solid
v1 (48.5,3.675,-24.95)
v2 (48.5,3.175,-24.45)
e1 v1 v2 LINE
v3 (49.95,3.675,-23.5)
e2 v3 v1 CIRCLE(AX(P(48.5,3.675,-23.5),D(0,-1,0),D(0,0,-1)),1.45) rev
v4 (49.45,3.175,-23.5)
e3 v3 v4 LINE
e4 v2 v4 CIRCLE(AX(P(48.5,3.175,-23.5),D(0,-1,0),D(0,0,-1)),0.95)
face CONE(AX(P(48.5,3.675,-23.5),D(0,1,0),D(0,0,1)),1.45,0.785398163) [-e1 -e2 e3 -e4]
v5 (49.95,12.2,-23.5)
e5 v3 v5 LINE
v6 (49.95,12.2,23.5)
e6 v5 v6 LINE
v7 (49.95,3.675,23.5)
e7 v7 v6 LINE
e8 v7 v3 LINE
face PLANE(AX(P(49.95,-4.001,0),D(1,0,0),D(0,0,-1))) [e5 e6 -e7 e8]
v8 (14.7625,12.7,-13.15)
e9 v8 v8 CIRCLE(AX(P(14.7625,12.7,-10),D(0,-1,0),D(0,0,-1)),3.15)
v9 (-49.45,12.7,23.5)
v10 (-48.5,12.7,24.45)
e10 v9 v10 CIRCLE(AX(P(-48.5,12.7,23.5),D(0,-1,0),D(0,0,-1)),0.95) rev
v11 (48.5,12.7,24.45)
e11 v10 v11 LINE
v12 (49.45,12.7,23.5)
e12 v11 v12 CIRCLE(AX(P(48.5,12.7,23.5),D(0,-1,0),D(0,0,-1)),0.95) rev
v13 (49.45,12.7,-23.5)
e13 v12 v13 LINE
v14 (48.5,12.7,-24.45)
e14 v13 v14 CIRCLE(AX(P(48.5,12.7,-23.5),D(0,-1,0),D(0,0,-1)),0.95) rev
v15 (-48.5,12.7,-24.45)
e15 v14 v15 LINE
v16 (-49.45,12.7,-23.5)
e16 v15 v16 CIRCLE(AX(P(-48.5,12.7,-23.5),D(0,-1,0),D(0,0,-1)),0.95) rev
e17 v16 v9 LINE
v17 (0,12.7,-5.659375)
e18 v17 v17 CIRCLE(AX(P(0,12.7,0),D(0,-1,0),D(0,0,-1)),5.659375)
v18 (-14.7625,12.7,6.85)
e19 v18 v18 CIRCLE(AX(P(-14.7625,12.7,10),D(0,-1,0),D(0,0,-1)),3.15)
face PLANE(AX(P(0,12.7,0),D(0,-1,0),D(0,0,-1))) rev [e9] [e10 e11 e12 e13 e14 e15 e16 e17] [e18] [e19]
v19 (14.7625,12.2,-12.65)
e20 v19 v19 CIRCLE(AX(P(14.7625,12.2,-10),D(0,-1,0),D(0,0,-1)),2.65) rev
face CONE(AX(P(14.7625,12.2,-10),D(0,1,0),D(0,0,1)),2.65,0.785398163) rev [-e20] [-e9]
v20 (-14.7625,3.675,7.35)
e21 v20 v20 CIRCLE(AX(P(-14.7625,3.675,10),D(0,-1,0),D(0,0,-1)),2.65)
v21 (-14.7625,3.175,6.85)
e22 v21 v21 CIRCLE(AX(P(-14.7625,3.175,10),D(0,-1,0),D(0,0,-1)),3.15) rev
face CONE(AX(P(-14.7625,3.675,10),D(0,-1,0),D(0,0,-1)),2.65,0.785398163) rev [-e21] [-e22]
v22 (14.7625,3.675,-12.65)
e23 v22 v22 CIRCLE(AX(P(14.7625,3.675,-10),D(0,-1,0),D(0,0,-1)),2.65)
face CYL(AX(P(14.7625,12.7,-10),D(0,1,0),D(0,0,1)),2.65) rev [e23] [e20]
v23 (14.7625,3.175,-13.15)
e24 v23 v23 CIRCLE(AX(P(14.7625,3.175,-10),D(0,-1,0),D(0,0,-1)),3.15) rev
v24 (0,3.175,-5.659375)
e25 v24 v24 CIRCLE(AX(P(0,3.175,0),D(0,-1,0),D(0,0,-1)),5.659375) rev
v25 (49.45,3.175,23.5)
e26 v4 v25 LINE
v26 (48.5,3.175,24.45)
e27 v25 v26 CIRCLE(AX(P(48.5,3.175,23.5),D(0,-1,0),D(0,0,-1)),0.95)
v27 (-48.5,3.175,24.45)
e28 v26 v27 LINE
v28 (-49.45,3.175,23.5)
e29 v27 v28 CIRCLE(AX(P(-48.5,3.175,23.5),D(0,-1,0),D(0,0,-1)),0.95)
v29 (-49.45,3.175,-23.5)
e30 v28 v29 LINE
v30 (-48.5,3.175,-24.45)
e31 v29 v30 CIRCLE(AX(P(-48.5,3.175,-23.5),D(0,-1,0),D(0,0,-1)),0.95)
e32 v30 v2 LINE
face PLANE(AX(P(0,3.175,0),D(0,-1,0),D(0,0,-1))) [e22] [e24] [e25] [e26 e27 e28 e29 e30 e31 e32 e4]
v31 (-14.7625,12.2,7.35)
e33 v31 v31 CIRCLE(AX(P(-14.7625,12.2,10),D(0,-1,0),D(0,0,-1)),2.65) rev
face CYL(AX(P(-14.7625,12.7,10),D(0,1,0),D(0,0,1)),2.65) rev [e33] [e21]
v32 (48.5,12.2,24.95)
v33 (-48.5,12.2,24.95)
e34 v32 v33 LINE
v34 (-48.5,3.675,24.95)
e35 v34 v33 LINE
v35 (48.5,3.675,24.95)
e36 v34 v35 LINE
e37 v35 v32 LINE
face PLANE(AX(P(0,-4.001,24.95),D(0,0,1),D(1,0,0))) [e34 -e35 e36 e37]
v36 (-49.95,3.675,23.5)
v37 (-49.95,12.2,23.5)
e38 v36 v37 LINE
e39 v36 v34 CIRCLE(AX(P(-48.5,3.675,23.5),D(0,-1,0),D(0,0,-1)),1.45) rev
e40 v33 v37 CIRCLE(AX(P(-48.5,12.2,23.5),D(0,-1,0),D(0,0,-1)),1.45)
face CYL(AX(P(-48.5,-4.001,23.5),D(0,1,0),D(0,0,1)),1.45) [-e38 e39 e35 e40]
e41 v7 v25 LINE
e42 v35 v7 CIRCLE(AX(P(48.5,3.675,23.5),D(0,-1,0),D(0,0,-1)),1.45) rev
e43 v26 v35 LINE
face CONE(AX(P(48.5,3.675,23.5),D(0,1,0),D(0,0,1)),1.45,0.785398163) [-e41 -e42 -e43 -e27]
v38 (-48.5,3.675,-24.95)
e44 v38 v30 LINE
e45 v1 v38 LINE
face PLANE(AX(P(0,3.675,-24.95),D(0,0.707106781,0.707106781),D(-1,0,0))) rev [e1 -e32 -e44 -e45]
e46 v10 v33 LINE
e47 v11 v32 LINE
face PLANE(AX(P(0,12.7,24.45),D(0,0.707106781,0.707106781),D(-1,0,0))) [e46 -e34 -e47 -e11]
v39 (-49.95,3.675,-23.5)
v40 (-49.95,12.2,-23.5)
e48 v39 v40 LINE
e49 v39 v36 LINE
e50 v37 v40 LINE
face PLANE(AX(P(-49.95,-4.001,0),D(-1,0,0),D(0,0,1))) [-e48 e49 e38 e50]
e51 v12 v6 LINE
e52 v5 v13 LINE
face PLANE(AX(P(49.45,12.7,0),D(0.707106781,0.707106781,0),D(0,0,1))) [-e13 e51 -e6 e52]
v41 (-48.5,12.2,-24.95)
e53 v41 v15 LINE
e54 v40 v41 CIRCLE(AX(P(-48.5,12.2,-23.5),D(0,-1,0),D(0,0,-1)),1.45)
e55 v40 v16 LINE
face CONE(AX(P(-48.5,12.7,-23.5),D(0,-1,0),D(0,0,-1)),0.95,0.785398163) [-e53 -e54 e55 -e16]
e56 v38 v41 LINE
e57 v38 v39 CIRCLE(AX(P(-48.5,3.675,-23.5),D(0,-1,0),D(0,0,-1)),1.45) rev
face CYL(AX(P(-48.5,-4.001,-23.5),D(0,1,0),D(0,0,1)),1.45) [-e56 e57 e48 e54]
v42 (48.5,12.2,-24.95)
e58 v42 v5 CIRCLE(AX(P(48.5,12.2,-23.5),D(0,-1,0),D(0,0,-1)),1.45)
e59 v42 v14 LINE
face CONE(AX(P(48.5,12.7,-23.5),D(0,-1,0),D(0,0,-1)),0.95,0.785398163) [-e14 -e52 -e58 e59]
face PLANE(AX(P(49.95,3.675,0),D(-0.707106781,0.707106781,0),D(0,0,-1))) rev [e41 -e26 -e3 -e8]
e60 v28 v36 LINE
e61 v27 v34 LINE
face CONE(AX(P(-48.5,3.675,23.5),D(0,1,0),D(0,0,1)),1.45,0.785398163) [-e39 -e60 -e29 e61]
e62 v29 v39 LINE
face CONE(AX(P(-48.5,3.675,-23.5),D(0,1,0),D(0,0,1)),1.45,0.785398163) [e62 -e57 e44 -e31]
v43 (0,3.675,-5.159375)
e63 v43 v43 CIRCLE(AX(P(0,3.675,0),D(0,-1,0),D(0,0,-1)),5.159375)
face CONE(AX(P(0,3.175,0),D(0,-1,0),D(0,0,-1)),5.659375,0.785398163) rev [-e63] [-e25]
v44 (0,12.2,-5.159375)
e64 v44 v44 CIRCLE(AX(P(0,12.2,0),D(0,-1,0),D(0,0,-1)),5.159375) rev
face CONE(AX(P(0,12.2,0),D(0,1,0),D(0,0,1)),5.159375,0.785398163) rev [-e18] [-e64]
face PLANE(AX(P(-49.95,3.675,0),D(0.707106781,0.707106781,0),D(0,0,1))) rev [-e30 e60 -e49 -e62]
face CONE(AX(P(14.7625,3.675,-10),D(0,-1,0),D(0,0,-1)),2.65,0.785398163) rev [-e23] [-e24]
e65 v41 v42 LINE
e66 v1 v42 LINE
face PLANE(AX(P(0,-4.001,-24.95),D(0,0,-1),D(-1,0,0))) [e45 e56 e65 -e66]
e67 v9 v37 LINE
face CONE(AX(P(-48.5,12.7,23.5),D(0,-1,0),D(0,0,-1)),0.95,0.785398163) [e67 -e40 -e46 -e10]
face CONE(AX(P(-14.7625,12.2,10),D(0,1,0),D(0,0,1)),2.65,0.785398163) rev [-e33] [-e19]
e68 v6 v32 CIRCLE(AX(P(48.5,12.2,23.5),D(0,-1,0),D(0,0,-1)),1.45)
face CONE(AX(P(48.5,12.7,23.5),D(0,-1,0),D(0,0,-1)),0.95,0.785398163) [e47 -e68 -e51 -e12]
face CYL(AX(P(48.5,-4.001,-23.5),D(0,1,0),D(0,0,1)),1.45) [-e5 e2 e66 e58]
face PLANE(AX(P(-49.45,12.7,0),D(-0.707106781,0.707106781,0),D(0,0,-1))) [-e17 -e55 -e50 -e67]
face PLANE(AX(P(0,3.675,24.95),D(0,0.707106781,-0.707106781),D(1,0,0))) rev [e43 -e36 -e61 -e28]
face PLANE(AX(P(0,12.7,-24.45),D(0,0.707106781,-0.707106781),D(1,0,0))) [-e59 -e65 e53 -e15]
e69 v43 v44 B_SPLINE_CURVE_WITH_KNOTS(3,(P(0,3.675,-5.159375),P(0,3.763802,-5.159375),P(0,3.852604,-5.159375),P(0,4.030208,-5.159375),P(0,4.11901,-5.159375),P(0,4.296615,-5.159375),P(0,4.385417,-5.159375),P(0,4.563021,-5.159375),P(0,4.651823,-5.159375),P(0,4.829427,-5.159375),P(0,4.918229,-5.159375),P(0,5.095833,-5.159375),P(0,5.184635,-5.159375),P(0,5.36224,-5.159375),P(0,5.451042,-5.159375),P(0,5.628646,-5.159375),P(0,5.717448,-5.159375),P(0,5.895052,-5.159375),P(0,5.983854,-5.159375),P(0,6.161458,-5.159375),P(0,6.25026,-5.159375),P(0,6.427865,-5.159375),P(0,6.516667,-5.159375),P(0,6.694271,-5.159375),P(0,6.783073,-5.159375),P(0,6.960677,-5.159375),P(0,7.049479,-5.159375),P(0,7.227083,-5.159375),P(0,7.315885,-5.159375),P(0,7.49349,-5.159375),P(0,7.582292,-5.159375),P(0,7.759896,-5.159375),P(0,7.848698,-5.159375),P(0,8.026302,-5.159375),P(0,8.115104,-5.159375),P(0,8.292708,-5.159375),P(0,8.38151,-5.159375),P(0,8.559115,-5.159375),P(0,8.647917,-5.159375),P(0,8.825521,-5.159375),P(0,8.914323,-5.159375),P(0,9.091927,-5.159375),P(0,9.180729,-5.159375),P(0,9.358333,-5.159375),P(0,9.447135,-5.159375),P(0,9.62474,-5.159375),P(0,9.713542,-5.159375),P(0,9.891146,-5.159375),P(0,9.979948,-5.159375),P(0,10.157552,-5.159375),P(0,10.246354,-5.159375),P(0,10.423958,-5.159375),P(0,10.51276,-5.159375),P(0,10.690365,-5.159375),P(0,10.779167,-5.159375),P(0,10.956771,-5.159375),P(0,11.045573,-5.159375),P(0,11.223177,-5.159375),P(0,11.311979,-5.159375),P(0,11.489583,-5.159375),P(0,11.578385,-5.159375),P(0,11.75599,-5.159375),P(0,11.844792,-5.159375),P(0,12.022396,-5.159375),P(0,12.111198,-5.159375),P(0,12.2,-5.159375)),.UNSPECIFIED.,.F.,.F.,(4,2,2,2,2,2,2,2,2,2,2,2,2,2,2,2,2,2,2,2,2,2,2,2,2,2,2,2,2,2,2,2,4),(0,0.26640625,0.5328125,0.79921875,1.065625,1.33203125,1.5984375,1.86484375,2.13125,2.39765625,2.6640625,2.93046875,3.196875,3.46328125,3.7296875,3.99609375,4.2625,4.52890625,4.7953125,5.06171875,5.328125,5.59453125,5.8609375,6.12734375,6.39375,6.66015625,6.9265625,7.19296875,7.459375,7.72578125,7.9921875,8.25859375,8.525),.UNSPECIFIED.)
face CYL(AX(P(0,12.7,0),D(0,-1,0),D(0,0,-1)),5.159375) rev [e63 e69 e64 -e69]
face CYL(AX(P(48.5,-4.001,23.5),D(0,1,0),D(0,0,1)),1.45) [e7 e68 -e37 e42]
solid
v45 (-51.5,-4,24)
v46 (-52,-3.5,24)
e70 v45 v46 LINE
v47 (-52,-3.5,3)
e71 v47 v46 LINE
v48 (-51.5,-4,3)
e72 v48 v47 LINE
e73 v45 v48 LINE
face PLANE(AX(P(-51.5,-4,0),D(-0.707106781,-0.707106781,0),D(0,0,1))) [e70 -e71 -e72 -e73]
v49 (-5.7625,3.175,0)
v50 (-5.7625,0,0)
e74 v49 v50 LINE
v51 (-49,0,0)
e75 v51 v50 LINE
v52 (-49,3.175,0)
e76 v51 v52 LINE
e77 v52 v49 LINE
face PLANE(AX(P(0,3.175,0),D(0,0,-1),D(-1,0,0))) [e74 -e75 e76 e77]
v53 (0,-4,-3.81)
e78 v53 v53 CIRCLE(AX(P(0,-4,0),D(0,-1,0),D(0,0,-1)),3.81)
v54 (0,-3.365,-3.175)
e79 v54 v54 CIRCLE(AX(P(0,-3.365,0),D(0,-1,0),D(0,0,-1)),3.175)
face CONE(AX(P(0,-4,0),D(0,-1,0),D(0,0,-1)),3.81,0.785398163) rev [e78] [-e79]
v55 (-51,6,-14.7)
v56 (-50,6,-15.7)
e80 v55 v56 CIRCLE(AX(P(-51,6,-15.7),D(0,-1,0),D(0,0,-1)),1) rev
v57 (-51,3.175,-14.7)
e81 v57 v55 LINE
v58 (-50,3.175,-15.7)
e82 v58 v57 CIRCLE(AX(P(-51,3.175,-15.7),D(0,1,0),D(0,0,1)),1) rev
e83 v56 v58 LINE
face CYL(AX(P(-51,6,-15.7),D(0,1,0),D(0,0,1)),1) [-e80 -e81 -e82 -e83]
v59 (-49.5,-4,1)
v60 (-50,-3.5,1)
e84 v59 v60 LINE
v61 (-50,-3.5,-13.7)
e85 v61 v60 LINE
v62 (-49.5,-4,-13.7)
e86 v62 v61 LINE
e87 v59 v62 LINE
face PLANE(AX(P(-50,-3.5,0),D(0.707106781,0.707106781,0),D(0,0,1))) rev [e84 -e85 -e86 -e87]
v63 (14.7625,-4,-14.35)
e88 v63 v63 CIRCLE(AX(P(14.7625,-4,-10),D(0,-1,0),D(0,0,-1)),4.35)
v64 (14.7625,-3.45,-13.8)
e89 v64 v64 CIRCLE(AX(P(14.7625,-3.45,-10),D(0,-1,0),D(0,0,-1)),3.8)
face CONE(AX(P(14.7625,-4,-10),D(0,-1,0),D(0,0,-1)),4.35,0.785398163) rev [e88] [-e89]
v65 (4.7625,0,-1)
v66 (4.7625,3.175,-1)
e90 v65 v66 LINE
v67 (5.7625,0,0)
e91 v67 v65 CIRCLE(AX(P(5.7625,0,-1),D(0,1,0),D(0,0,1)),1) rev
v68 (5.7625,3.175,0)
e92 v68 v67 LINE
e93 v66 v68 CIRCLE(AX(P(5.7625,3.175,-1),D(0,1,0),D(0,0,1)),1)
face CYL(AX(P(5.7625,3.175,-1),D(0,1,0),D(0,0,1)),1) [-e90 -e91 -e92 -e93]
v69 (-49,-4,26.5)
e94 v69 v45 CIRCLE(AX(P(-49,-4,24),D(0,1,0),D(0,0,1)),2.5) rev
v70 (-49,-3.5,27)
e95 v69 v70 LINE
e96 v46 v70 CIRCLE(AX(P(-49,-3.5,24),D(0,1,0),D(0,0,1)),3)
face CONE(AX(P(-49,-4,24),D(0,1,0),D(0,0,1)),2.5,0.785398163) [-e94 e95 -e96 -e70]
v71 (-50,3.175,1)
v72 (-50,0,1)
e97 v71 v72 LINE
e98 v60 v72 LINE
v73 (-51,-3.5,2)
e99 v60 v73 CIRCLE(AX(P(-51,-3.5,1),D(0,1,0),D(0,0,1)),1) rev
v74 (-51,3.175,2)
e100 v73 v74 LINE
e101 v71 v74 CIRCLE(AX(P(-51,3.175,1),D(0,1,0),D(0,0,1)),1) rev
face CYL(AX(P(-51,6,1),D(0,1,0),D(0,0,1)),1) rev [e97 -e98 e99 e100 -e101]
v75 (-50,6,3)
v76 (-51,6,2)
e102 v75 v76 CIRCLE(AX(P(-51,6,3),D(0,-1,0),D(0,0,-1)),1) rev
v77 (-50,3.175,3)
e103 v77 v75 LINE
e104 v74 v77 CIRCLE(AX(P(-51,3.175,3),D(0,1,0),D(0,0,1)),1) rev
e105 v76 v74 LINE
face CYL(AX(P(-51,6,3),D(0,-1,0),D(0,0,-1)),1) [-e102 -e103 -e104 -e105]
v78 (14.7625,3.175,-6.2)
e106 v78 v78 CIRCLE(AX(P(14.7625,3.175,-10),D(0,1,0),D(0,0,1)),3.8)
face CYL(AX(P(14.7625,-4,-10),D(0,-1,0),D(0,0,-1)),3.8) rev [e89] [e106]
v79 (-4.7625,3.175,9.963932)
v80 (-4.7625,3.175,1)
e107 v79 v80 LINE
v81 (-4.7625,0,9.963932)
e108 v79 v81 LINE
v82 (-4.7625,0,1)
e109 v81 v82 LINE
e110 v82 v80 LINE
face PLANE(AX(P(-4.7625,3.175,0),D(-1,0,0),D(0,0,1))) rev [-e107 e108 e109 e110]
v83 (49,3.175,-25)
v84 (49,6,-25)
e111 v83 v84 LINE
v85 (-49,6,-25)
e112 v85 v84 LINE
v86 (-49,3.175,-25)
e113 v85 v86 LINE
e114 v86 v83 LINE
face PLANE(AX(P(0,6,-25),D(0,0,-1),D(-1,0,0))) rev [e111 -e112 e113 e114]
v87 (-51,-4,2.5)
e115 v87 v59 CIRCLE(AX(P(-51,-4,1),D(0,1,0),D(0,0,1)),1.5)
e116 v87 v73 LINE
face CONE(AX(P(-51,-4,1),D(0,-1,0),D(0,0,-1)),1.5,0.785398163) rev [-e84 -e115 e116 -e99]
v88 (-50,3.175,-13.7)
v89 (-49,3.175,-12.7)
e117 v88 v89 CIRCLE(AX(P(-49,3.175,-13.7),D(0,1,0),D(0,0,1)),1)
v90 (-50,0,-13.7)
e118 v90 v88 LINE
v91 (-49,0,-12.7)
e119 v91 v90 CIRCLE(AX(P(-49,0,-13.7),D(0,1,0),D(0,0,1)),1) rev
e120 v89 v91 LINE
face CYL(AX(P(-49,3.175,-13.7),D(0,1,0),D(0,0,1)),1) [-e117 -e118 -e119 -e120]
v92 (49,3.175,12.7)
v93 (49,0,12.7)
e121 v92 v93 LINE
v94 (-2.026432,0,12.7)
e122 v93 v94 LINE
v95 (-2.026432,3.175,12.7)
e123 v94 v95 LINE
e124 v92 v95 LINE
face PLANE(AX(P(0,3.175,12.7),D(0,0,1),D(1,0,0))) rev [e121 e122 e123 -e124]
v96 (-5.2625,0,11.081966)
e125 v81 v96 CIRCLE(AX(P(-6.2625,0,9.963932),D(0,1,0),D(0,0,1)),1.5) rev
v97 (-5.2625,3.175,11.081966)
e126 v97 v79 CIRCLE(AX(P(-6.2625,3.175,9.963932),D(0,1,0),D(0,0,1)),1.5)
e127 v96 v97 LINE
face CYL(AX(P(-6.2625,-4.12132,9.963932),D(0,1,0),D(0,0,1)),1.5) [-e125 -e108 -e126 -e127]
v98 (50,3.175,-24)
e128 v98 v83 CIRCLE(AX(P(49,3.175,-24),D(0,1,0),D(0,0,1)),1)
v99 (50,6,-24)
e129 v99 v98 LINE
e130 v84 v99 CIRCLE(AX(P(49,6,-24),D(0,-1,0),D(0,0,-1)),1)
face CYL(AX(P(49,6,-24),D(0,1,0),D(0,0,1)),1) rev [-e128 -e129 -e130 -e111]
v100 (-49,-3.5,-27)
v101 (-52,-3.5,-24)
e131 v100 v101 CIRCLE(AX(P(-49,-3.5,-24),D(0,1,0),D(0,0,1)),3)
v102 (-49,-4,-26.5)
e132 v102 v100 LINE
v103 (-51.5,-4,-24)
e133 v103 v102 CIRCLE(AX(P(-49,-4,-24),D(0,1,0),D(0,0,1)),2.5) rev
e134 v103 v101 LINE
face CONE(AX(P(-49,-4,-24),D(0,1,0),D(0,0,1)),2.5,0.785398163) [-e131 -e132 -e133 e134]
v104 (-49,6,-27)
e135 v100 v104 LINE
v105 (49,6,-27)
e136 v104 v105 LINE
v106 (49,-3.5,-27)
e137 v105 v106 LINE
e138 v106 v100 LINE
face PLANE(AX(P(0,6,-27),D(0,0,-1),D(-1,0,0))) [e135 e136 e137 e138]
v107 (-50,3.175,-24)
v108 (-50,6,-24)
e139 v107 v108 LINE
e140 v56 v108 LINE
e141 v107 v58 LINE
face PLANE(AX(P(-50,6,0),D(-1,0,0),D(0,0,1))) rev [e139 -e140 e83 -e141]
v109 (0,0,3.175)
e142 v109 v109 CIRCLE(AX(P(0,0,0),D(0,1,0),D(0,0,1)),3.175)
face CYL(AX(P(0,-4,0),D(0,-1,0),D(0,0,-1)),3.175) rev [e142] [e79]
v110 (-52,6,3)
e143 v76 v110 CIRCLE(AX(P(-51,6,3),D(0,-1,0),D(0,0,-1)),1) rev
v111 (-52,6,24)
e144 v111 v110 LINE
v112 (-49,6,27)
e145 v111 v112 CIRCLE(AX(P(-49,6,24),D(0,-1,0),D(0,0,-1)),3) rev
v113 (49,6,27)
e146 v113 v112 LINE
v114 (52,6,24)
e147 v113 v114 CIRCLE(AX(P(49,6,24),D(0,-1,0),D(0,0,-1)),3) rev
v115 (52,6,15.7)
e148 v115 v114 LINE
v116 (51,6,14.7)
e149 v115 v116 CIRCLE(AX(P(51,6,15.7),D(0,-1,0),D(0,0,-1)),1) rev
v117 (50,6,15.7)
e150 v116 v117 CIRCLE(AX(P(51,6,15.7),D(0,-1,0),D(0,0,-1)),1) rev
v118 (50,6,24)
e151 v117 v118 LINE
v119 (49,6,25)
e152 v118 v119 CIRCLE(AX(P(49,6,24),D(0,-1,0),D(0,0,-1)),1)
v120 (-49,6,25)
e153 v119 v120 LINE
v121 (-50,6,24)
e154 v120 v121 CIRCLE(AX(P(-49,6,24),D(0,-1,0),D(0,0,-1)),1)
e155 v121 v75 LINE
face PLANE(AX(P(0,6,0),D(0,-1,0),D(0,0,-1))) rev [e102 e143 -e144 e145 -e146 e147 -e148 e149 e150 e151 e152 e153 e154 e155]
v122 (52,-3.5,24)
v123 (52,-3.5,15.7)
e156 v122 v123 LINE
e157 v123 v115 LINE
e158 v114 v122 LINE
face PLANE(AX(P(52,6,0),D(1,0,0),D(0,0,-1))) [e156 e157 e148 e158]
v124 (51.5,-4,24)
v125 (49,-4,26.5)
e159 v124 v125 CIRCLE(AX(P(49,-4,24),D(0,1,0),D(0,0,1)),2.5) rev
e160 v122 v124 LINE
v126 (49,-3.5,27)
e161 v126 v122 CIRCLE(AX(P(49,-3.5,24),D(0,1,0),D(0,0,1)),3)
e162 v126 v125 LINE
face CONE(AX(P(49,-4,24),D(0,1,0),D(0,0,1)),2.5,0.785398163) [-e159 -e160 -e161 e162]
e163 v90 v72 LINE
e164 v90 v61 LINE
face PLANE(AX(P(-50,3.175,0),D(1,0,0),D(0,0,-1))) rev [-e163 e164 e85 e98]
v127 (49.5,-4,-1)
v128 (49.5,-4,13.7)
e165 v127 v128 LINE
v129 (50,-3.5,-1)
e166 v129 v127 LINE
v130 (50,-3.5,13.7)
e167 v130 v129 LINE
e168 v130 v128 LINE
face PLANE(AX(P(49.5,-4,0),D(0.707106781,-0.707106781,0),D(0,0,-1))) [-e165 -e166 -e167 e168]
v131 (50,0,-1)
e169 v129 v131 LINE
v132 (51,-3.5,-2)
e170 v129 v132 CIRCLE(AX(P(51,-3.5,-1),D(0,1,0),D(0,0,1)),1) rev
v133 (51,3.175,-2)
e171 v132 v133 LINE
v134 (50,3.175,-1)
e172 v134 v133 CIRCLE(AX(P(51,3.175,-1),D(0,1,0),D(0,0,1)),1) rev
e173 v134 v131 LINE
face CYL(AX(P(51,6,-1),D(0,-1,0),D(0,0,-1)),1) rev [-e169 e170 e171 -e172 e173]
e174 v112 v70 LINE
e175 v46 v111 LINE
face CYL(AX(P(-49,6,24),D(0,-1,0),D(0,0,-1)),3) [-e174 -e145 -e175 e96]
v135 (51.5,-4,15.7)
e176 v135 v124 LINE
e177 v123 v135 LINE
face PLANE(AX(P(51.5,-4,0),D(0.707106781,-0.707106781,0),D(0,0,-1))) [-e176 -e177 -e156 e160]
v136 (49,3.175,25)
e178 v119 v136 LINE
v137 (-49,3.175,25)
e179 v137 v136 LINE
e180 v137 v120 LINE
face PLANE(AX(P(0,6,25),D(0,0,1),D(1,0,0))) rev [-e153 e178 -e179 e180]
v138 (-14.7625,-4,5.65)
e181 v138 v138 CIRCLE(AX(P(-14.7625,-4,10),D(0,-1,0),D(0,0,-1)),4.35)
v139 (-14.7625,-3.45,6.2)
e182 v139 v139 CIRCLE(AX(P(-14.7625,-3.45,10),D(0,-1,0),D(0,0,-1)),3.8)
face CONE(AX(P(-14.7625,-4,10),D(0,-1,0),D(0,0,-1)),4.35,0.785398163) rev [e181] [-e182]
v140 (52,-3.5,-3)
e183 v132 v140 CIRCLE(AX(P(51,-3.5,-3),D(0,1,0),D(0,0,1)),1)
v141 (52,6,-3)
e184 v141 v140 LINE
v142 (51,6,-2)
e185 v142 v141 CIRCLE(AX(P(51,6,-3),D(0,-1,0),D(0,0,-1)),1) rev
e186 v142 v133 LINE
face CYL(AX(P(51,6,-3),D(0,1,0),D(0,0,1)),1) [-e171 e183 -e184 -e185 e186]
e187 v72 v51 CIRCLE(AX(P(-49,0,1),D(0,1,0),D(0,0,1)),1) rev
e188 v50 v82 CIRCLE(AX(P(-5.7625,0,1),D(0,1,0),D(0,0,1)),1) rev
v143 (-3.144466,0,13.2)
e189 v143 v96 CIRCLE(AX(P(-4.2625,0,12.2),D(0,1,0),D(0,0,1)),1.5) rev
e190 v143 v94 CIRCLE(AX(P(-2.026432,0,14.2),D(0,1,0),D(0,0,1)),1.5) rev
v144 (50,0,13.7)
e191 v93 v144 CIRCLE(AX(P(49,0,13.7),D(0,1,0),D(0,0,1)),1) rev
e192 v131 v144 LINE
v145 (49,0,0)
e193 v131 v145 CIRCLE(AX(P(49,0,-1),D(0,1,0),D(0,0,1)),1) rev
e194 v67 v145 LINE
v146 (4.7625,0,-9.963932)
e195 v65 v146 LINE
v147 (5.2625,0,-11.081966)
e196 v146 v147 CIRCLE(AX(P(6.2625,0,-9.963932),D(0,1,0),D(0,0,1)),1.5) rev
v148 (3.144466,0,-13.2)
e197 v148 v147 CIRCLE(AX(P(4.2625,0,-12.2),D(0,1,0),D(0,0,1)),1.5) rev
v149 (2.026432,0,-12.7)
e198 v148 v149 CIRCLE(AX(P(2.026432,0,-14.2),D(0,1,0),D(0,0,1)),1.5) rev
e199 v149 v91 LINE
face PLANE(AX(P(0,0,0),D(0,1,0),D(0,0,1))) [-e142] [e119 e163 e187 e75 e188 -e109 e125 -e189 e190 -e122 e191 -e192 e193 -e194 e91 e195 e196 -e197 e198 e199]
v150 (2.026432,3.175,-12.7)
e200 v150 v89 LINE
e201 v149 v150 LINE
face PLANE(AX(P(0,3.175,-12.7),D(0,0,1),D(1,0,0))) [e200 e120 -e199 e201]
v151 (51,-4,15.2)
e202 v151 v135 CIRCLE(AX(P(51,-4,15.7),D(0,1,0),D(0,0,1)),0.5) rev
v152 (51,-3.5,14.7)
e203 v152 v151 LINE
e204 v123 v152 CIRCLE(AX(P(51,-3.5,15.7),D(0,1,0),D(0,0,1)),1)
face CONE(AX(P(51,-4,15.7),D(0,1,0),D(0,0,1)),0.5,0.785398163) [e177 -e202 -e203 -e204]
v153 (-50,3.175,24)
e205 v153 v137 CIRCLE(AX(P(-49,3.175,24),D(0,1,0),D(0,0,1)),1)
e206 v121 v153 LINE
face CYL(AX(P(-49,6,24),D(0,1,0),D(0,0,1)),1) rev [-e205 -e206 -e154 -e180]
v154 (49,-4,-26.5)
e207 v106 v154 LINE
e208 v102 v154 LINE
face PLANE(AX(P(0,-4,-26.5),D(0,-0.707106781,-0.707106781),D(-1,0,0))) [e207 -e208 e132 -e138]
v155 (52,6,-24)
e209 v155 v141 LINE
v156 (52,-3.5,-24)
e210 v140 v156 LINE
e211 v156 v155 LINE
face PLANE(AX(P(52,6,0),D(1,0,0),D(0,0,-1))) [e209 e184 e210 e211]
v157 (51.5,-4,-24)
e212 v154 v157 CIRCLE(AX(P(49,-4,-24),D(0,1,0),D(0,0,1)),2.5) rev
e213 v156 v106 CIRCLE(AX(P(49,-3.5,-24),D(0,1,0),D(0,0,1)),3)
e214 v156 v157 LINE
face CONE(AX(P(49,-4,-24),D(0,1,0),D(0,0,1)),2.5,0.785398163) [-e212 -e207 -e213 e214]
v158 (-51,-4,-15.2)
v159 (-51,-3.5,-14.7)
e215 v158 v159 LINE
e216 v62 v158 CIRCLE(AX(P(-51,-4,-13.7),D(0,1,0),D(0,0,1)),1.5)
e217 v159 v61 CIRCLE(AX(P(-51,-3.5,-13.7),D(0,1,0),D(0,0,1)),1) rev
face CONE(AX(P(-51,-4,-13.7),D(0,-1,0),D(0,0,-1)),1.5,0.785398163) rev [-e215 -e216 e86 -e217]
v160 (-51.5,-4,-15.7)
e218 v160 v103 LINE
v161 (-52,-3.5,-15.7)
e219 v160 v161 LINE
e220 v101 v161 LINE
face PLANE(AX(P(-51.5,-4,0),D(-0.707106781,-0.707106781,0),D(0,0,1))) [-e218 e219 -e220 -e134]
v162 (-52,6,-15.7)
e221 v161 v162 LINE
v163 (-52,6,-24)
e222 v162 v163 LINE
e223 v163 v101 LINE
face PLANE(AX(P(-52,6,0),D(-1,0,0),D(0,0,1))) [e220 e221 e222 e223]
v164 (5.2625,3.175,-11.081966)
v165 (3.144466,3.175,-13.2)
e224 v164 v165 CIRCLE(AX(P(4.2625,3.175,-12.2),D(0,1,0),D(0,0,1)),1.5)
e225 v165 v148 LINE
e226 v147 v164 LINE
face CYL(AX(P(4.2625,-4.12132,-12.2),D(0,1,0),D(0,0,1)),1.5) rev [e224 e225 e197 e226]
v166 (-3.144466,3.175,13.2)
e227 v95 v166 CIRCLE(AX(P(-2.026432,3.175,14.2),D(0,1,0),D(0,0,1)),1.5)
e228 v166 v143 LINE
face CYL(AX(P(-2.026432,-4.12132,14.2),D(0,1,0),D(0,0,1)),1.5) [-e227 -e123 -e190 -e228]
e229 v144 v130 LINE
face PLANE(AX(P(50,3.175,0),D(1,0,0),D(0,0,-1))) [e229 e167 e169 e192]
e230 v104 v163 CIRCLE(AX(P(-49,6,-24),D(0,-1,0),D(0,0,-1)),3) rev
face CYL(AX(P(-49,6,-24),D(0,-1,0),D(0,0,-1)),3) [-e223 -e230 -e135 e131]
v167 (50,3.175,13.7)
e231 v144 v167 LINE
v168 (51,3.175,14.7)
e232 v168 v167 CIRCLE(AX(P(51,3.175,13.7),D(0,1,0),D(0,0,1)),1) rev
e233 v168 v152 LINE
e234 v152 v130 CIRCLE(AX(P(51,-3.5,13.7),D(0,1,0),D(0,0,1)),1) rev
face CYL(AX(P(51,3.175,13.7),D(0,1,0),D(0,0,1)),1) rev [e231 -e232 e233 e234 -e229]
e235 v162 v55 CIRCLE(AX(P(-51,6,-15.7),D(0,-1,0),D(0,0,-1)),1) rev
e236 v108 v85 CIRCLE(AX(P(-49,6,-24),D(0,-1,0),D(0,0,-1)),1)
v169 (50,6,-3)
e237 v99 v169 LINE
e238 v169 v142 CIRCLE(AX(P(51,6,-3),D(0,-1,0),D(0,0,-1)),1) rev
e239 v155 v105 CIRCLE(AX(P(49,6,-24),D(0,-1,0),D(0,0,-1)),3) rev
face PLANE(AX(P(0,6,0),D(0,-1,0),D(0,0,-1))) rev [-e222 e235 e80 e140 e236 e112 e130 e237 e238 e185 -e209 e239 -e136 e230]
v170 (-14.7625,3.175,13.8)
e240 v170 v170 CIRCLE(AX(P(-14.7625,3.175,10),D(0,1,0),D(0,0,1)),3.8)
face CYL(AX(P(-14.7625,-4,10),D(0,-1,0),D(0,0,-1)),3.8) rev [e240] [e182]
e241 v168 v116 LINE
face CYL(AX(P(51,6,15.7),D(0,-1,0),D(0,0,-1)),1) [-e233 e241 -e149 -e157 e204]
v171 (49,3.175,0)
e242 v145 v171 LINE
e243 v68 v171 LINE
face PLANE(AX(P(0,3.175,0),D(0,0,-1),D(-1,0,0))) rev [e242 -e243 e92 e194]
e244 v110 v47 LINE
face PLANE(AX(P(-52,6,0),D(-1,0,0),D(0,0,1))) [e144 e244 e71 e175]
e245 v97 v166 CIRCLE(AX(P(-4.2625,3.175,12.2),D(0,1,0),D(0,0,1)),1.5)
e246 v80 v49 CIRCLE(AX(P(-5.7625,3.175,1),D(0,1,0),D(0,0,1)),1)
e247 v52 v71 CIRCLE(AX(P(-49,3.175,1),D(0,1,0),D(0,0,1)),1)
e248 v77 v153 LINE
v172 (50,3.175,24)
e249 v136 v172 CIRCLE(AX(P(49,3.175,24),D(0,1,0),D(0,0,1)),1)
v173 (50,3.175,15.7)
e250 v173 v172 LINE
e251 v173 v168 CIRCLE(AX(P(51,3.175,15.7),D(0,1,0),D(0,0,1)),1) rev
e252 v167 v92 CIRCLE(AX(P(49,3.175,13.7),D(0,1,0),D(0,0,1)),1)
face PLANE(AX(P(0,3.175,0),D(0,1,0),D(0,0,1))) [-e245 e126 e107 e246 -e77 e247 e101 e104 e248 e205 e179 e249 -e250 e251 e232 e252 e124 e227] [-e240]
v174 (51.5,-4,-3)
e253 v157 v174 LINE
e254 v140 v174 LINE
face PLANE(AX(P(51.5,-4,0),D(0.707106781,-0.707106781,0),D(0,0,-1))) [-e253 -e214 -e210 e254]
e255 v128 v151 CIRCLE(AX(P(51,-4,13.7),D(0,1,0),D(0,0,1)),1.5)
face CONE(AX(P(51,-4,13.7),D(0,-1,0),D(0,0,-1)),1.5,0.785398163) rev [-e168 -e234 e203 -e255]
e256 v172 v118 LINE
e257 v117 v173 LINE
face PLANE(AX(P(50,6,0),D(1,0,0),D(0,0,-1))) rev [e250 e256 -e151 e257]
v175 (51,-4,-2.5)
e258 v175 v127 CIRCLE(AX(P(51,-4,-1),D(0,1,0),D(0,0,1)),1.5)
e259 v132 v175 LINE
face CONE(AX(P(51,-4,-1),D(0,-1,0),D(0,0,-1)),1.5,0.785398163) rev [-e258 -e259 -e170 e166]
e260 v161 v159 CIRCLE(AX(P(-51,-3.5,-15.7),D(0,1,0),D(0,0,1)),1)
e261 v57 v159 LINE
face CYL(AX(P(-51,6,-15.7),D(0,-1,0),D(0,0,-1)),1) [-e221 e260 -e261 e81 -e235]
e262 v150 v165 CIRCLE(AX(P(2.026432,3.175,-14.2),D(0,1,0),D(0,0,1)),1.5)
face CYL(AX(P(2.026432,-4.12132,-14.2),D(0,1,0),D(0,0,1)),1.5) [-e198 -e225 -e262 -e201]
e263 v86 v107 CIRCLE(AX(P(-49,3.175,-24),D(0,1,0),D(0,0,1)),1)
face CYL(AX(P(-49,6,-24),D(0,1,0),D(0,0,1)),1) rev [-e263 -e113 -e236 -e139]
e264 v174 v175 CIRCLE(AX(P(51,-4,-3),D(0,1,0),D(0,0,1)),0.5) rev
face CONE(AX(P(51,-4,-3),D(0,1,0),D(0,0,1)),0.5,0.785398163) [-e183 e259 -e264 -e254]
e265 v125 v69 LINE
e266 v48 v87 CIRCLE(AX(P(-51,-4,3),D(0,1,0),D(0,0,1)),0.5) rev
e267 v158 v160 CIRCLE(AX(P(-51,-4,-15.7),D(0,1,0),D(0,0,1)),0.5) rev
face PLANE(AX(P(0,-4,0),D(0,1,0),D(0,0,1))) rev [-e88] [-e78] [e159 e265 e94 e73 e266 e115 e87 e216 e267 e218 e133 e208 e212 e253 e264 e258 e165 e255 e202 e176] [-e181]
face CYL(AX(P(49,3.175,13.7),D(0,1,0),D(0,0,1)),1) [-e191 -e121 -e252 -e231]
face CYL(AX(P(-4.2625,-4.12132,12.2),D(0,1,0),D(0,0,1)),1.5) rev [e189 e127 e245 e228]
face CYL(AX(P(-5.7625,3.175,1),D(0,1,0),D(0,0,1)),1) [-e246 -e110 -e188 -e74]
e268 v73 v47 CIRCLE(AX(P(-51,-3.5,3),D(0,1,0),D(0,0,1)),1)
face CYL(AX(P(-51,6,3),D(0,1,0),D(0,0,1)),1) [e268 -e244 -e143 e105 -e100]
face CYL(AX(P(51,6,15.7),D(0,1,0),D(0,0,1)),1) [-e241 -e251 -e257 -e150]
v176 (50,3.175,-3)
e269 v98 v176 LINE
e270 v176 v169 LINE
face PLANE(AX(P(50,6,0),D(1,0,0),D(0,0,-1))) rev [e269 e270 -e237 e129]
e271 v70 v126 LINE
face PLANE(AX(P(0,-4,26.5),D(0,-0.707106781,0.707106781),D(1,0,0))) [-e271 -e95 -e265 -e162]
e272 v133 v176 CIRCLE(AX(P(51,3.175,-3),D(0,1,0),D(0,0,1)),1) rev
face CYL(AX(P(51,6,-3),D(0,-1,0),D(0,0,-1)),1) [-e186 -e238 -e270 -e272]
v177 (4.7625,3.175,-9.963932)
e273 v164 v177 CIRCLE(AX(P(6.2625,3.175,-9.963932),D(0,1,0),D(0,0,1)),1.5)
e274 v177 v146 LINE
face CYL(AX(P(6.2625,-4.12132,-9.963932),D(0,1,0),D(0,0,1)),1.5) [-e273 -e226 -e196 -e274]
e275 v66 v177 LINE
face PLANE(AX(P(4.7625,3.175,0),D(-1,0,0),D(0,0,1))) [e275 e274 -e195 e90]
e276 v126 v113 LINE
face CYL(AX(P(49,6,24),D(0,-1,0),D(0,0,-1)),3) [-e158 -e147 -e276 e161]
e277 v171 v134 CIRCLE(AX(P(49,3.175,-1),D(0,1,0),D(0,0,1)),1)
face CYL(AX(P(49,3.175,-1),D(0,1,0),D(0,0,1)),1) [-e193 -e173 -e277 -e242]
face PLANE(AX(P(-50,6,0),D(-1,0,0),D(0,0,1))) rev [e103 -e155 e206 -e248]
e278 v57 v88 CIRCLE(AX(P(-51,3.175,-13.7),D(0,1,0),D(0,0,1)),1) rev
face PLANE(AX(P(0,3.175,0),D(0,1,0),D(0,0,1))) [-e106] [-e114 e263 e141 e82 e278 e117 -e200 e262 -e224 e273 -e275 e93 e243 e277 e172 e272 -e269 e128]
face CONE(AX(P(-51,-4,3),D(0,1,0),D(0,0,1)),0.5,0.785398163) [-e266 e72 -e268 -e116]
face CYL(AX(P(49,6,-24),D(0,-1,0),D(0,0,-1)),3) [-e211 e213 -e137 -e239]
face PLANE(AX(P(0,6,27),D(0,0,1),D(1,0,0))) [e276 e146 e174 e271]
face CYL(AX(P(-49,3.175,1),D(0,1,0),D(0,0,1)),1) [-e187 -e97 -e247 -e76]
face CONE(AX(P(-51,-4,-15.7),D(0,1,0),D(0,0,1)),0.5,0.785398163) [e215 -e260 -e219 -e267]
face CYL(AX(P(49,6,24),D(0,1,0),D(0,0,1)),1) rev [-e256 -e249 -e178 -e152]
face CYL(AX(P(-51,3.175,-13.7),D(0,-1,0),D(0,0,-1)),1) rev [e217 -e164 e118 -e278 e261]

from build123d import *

# Parameters (mm, degrees)
BOSS_EXTRUDE1_DEPTH                 = 3.175
BOSS_EXTRUDE1_2_DEPTH               = 3.175
BOSS_EXTRUDE2_START                 = 3.175
SKETCH1_3_W                         = 100
SKETCH1_3_H                         = 50
SKETCH1_3_R                         = 5.159375
BOSS_EXTRUDE2_DEPTH                 = 9.525
SKETCH1_5_W                         = 100
SKETCH1_5_H                         = 50
SKETCH1_5_R                         = 2.38125
BOSS_EXTRUDE3_DEPTH                 = 4
F_7_6_7_6_DIAMETER_HOLE1_AT_2_COUNT = 2
F_7_6_7_6_DIAMETER_HOLE1_AT_2_PITCH = 35.661262246
SKETCH9_W                           = 2.65
SKETCH9_H                           = 9.525
M5_CLEARANCE_HOLE1_AT_2_COUNT       = 2
M5_CLEARANCE_HOLE1_AT_2_PITCH       = 35.661262246
BOSS_EXTRUDE4_DEPTH                 = 10
CUT_EXTRUDE1_DEPTH                  = 3.175
FILLET1_R                           = 1.5
FILLET2_R                           = 1
FILLET3_R                           = 3
FILLET4_R                           = 1.5
FILLET5_R                           = 1
CUT_EXTRUDE2_START                  = -9.525
CUT_EXTRUDE2_DEPTH                  = 9.525
CHAMFER1_SIZE                       = 0.5
CHAMFER2_SIZE                       = 0.5


# Read off the part's stored shape, not the designer's step: Cut-Extrude2
with BuildPart() as part:
    # Sketch1 → Boss-Extrude1 (new body)
    with BuildSketch(Plane(origin=(0, 0, 0), x_dir=(1, 0, 0), z_dir=(0, 1, 0))):
        Polygon((4.7625, 0), (50, 0), (50, 25), (-50, 25), (-50, 12.7), (4.7625, 12.7), align=None)
    extrude(amount=BOSS_EXTRUDE1_DEPTH)



with BuildPart() as body_2:
    # Sketch1 → Boss-Extrude1 2 (new body)
    with BuildSketch(Plane(origin=(0, 0, 0), x_dir=(1, 0, 0), z_dir=(0, 1, 0))):
        Polygon((-4.7625, 0), (-50, 0), (-50, -25), (50, -25), (50, -12.7), (-4.7625, -12.7), align=None)
    extrude(amount=BOSS_EXTRUDE1_2_DEPTH)


with BuildPart() as body_3:
    # Sketch1<3> → Boss-Extrude2 (new body)
    with BuildSketch(Plane(origin=(0, 0, 0), x_dir=(1, 0, 0), z_dir=(0, 1, 0)).offset(BOSS_EXTRUDE2_START)):
        Rectangle(SKETCH1_3_W, SKETCH1_3_H)
        with Locations(Location((0, 0, 0), (0, 0, 90))):
            Circle(SKETCH1_3_R, mode=Mode.SUBTRACT)
    extrude(amount=BOSS_EXTRUDE2_DEPTH)

    # Sketch9 → M5 Clearance Hole1 (revolve, cut)
    with BuildSketch(Plane(origin=(14.7625, 12.7, -10), x_dir=(0, 0, 1), z_dir=(1, 0, 0))):
        with Locations((1.325, 4.7625)):
            Rectangle(SKETCH9_W, SKETCH9_H)
    m5_clearance_hole1 = revolve(axis=Axis((14.7625, 19.05, -10), (0, -1, 0)), mode=Mode.SUBTRACT)

    # M5 Clearance Hole1 at 2: M5 Clearance Hole1 ×2
    with Locations(*[Vector(-0.8279291909544274, 0, 0.5608326441689601) * (i * M5_CLEARANCE_HOLE1_AT_2_PITCH) for i in range(1, M5_CLEARANCE_HOLE1_AT_2_COUNT)]):
        add(m5_clearance_hole1, mode=Mode.SUBTRACT)

    # Fillet1
    fillet1_edges = [body_3.edges().sort_by_distance(p)[0] for p in [
        (50, 7.9375, 25),
        (50, 7.9375, -25),
        (-50, 7.9375, -25),
        (-50, 7.9375, 25),
    ]]
    fillet(fillet1_edges, radius=FILLET1_R)

    # Cut-Extrude2 outline → Cut-Extrude2 (cut)
    with BuildSketch(Plane(origin=(0, 12.7, 0), x_dir=(1, 0, 0), z_dir=(0, 1, 0)).offset(CUT_EXTRUDE2_START)):
        with BuildLine():
            ThreePointArc((-50, -23.5), (-49.560660172, -24.560660172), (-48.5, -25))
            Line((-48.5, -25), (48.5, -25))
            ThreePointArc((48.5, -25), (49.560660172, -24.560660172), (50, -23.5))
            Line((50, -23.5), (50, 23.5))
            ThreePointArc((50, 23.5), (49.560660172, 24.560660172), (48.5, 25))
            Line((48.5, 25), (-48.5, 25))
            ThreePointArc((-48.5, 25), (-49.560660172, 24.560660172), (-50, 23.5))
            Line((-50, 23.5), (-50, -23.5))
        make_face()
        with BuildLine():
            ThreePointArc((48.5, 24.95), (49.525304833, 24.525304833), (49.95, 23.5))
            Line((49.95, 23.5), (49.95, -23.5))
            ThreePointArc((49.95, -23.5), (49.525304833, -24.525304833), (48.5, -24.95))
            Line((48.5, -24.95), (-48.5, -24.95))
            ThreePointArc((-48.5, -24.95), (-49.525304833, -24.525304833), (-49.95, -23.5))
            Line((-49.95, -23.5), (-49.95, 23.5))
            ThreePointArc((-49.95, 23.5), (-49.525304833, 24.525304833), (-48.5, 24.95))
            Line((-48.5, 24.95), (48.5, 24.95))
        make_face(mode=Mode.SUBTRACT)
    extrude(amount=CUT_EXTRUDE2_DEPTH, mode=Mode.SUBTRACT)

    # Chamfer2
    chamfer2_edges = [body_3.edges().sort_by_distance(p)[0] for p in [
        (49.525304833, 12.7, -24.525304833),
        (0, 12.7, -24.95),
        (-49.525304833, 12.7, -24.525304833),
        (-49.95, 12.7, 0),
        (-49.525304833, 12.7, 24.525304833),
        (0, 12.7, 24.95),
        (49.525304833, 12.7, 24.525304833),
        (49.95, 12.7, 0),
        (49.95, 3.175, 0),
        (49.525304833, 3.175, -24.525304833),
        (0, 3.175, -24.95),
        (-49.525304833, 3.175, -24.525304833),
        (-49.95, 3.175, 0),
        (-49.525304833, 3.175, 24.525304833),
        (0, 3.175, 24.95),
        (49.525304833, 3.175, 24.525304833),
        (0, 3.175, 5.159375),
        (0, 12.7, 5.159375),
        (-14.7625, 12.7, 7.35),
        (-14.7625, 3.175, 7.35),
        (14.7625, 12.7, -12.65),
        (14.7625, 3.175, -12.65),
    ]]
    chamfer(chamfer2_edges, length=CHAMFER2_SIZE)


with BuildPart() as part_1:
    add(part.part)

    add(body_2.part)  # Boss-Extrude3 merges body 2
    # Sketch1<5> → Boss-Extrude3 (add)
    with BuildSketch(Plane(origin=(0, 0, 0), x_dir=(1, 0, 0), z_dir=(0, 1, 0))):
        Rectangle(SKETCH1_5_W, SKETCH1_5_H)
        with Locations(Location((0, 0, 0), (0, 0, 270))):
            Circle(SKETCH1_5_R, mode=Mode.SUBTRACT)
    extrude(amount=-BOSS_EXTRUDE3_DEPTH)

    # Sketch7 → Ø7.6 (7.6) Diameter Hole1 (revolve, cut)
    with BuildSketch(Plane(origin=(-14.7625, -4, 10), x_dir=(0, 0, -1), z_dir=(1, 0, 0))):
        Polygon((0, 0), (0, 16.7), (3.8, 16.7), (3.8, 0.55), (4.35, 0), align=None)
    f_7_6_7_6_diameter_hole1 = revolve(axis=Axis((-14.7625, -10.35, 10), (0, 1, 0)), mode=Mode.SUBTRACT)

    # Ø7.6 (7.6) Diameter Hole1 at 2: Ø7.6 (7.6) Diameter Hole1 ×2
    with Locations(*[Vector(0.8279291909544274, 0, -0.5608326441689601) * (i * F_7_6_7_6_DIAMETER_HOLE1_AT_2_PITCH) for i in range(1, F_7_6_7_6_DIAMETER_HOLE1_AT_2_COUNT)]):
        add(f_7_6_7_6_diameter_hole1, mode=Mode.SUBTRACT)

    # Sketch10 → Boss-Extrude4 (add)
    with BuildSketch(Plane.XZ.offset(4)):
        Polygon((52, 14.7), (52, 27), (-52, 27), (-52, 2), (-50, 2), (-50, 25), (50, 25), (50, 14.7), align=None)
        Polygon((52, -27), (52, -2), (50, -2), (50, -25), (-50, -25), (-50, -14.7), (-52, -14.7), (-52, -27), align=None)
    extrude(amount=-BOSS_EXTRUDE4_DEPTH)

    # Sketch11 → Cut-Extrude1 (cut)
    with BuildSketch(Plane(origin=(0, 3.175, 0), x_dir=(1, 0, 0), z_dir=(0, 1, 0))):
        with BuildLine():
            Line((-2.848286438, -12.7), (-4.7625, -12.7))
            Line((-4.7625, -12.7), (-4.7625, -10.785786438))
            ThreePointArc((-4.7625, -10.785786438), (-5.323160172, -13.260660172), (-2.848286438, -12.7))
        make_face()
        with BuildLine():
            Line((-4.7625, -10.785786438), (-4.7625, -12.7))
            Line((-4.7625, -12.7), (-2.848286438, -12.7))
            ThreePointArc((-2.848286438, -12.7), (-2.784102161, -12.453652968), (-2.7625, -12.2))
            ThreePointArc((-2.7625, -12.2), (-3.396474596, -10.975255129), (-4.7625, -10.785786438))
        make_face()
        with BuildLine():
            Line((4.7625, 10.785786438), (4.7625, 12.7))
            Line((4.7625, 12.7), (2.848286438, 12.7))
            ThreePointArc((2.848286438, 12.7), (3.201839828, 11.139339828), (4.7625, 10.785786438))
        make_face()
        with BuildLine():
            Line((2.848286438, 12.7), (4.7625, 12.7))
            Line((4.7625, 12.7), (4.7625, 10.785786438))
            ThreePointArc((4.7625, 10.785786438), (5.487244871, 11.333974596), (5.7625, 12.2))
            ThreePointArc((5.7625, 12.2), (4.516152968, 13.678397839), (2.848286438, 12.7))
        make_face()
    extrude(amount=-CUT_EXTRUDE1_DEPTH, mode=Mode.SUBTRACT)

    # Fillet2
    fillet2_edges = [part_1.edges().sort_by_distance(p)[0] for p in [
        (-50, 4.5875, -25),
        (50, 4.5875, -25),
        (52, 1, -2),
        (-52, 1, -14.7),
        (-50, 1.5875, -12.7),
        (50, 1.5875, 0),
        (4.7625, 1.5875, 0),
        (-4.7625, 1.5875, 0),
        (-50, 1.5875, 0),
        (50, 1.5875, 12.7),
        (-52, 1, 2),
        (52, 1, 14.7),
        (50, 4.5875, 25),
        (-50, 4.5875, 25),
        (-50, 4.5875, -14.7),
        (50, 4.5875, -2),
        (-50, 4.5875, 2),
        (50, 4.5875, 14.7),
    ]]
    fillet(fillet2_edges, radius=FILLET2_R - 0.0001)  # a hair under: the kernel refuses the full size

    # Fillet3
    fillet3_edges = [part_1.edges().sort_by_distance(p)[0] for p in [
        (52, 1, -27),
        (-52, 1, -27),
        (-52, 1, 27),
        (52, 1, 27),
    ]]
    fillet(fillet3_edges, radius=FILLET3_R)

    # Fillet4
    fillet4_edges = [part_1.edges().sort_by_distance(p)[0] for p in [
        (-4.7625, 1.5875, 10.785786438),
        (-2.848286438, 1.5875, 12.7),
        (4.7625, 1.5875, -10.785786438),
        (2.848286438, 1.5875, -12.7),
    ]]
    fillet(fillet4_edges, radius=FILLET4_R)

    # Fillet5
    fillet5_edges = [part_1.edges().sort_by_distance(p)[0] for p in [
        (-50, -0.4125, -14.7),
        (-50, -0.4125, 2),
        (50, -0.4125, 14.7),
        (50, -0.4125, -2),
    ]]
    fillet(fillet5_edges, radius=FILLET5_R - 0.0001)  # a hair under: the kernel refuses the full size

    # Chamfer1
    chamfer1_edges = [part_1.edges().sort_by_distance(p)[0] for p in [
        (-52, -4, -19.84995),
        (52, -4, 19.84995),
        (51.707136071, -4, -2.292863929),
        (51.707136071, -4, 14.992863929),
        (-51.707136071, -4, 2.292863929),
        (-51.707136071, -4, -14.992863929),
        (0, -4, 27),
        (0, -4, -27),
        (52, -4, -13.49995),
        (-52, -4, 13.49995),
        (51.121320344, -4, 26.121320344),
        (51.121320344, -4, -26.121320344),
        (-51.121320344, -4, -26.121320344),
        (-51.121320344, -4, 26.121320344),
        (-50, -4, -6.35),
        (50, -4, 6.35),
        (-50.292863929, -4, -14.407136071),
        (-50.292863929, -4, 1.707136071),
        (50.292863929, -4, 14.407136071),
        (50.292863929, -4, -1.707136071),
    ]]
    chamfer(chamfer1_edges, length=CHAMFER1_SIZE)

    # Sketch15 → 1/4 (0.25) Diameter Hole1 (revolve, cut)
    with BuildSketch(Plane(origin=(0, -4, 0), x_dir=(0, 0, -1), z_dir=(1, 0, 0))):
        Polygon((0, 0), (0, 10), (3.175, 10), (3.175, 0.635), (3.81, 0), align=None)
    revolve(axis=Axis((0, -10.35, 0), (0, 1, 0)), mode=Mode.SUBTRACT)


solid = Compound([body_3.part, part_1.part])
